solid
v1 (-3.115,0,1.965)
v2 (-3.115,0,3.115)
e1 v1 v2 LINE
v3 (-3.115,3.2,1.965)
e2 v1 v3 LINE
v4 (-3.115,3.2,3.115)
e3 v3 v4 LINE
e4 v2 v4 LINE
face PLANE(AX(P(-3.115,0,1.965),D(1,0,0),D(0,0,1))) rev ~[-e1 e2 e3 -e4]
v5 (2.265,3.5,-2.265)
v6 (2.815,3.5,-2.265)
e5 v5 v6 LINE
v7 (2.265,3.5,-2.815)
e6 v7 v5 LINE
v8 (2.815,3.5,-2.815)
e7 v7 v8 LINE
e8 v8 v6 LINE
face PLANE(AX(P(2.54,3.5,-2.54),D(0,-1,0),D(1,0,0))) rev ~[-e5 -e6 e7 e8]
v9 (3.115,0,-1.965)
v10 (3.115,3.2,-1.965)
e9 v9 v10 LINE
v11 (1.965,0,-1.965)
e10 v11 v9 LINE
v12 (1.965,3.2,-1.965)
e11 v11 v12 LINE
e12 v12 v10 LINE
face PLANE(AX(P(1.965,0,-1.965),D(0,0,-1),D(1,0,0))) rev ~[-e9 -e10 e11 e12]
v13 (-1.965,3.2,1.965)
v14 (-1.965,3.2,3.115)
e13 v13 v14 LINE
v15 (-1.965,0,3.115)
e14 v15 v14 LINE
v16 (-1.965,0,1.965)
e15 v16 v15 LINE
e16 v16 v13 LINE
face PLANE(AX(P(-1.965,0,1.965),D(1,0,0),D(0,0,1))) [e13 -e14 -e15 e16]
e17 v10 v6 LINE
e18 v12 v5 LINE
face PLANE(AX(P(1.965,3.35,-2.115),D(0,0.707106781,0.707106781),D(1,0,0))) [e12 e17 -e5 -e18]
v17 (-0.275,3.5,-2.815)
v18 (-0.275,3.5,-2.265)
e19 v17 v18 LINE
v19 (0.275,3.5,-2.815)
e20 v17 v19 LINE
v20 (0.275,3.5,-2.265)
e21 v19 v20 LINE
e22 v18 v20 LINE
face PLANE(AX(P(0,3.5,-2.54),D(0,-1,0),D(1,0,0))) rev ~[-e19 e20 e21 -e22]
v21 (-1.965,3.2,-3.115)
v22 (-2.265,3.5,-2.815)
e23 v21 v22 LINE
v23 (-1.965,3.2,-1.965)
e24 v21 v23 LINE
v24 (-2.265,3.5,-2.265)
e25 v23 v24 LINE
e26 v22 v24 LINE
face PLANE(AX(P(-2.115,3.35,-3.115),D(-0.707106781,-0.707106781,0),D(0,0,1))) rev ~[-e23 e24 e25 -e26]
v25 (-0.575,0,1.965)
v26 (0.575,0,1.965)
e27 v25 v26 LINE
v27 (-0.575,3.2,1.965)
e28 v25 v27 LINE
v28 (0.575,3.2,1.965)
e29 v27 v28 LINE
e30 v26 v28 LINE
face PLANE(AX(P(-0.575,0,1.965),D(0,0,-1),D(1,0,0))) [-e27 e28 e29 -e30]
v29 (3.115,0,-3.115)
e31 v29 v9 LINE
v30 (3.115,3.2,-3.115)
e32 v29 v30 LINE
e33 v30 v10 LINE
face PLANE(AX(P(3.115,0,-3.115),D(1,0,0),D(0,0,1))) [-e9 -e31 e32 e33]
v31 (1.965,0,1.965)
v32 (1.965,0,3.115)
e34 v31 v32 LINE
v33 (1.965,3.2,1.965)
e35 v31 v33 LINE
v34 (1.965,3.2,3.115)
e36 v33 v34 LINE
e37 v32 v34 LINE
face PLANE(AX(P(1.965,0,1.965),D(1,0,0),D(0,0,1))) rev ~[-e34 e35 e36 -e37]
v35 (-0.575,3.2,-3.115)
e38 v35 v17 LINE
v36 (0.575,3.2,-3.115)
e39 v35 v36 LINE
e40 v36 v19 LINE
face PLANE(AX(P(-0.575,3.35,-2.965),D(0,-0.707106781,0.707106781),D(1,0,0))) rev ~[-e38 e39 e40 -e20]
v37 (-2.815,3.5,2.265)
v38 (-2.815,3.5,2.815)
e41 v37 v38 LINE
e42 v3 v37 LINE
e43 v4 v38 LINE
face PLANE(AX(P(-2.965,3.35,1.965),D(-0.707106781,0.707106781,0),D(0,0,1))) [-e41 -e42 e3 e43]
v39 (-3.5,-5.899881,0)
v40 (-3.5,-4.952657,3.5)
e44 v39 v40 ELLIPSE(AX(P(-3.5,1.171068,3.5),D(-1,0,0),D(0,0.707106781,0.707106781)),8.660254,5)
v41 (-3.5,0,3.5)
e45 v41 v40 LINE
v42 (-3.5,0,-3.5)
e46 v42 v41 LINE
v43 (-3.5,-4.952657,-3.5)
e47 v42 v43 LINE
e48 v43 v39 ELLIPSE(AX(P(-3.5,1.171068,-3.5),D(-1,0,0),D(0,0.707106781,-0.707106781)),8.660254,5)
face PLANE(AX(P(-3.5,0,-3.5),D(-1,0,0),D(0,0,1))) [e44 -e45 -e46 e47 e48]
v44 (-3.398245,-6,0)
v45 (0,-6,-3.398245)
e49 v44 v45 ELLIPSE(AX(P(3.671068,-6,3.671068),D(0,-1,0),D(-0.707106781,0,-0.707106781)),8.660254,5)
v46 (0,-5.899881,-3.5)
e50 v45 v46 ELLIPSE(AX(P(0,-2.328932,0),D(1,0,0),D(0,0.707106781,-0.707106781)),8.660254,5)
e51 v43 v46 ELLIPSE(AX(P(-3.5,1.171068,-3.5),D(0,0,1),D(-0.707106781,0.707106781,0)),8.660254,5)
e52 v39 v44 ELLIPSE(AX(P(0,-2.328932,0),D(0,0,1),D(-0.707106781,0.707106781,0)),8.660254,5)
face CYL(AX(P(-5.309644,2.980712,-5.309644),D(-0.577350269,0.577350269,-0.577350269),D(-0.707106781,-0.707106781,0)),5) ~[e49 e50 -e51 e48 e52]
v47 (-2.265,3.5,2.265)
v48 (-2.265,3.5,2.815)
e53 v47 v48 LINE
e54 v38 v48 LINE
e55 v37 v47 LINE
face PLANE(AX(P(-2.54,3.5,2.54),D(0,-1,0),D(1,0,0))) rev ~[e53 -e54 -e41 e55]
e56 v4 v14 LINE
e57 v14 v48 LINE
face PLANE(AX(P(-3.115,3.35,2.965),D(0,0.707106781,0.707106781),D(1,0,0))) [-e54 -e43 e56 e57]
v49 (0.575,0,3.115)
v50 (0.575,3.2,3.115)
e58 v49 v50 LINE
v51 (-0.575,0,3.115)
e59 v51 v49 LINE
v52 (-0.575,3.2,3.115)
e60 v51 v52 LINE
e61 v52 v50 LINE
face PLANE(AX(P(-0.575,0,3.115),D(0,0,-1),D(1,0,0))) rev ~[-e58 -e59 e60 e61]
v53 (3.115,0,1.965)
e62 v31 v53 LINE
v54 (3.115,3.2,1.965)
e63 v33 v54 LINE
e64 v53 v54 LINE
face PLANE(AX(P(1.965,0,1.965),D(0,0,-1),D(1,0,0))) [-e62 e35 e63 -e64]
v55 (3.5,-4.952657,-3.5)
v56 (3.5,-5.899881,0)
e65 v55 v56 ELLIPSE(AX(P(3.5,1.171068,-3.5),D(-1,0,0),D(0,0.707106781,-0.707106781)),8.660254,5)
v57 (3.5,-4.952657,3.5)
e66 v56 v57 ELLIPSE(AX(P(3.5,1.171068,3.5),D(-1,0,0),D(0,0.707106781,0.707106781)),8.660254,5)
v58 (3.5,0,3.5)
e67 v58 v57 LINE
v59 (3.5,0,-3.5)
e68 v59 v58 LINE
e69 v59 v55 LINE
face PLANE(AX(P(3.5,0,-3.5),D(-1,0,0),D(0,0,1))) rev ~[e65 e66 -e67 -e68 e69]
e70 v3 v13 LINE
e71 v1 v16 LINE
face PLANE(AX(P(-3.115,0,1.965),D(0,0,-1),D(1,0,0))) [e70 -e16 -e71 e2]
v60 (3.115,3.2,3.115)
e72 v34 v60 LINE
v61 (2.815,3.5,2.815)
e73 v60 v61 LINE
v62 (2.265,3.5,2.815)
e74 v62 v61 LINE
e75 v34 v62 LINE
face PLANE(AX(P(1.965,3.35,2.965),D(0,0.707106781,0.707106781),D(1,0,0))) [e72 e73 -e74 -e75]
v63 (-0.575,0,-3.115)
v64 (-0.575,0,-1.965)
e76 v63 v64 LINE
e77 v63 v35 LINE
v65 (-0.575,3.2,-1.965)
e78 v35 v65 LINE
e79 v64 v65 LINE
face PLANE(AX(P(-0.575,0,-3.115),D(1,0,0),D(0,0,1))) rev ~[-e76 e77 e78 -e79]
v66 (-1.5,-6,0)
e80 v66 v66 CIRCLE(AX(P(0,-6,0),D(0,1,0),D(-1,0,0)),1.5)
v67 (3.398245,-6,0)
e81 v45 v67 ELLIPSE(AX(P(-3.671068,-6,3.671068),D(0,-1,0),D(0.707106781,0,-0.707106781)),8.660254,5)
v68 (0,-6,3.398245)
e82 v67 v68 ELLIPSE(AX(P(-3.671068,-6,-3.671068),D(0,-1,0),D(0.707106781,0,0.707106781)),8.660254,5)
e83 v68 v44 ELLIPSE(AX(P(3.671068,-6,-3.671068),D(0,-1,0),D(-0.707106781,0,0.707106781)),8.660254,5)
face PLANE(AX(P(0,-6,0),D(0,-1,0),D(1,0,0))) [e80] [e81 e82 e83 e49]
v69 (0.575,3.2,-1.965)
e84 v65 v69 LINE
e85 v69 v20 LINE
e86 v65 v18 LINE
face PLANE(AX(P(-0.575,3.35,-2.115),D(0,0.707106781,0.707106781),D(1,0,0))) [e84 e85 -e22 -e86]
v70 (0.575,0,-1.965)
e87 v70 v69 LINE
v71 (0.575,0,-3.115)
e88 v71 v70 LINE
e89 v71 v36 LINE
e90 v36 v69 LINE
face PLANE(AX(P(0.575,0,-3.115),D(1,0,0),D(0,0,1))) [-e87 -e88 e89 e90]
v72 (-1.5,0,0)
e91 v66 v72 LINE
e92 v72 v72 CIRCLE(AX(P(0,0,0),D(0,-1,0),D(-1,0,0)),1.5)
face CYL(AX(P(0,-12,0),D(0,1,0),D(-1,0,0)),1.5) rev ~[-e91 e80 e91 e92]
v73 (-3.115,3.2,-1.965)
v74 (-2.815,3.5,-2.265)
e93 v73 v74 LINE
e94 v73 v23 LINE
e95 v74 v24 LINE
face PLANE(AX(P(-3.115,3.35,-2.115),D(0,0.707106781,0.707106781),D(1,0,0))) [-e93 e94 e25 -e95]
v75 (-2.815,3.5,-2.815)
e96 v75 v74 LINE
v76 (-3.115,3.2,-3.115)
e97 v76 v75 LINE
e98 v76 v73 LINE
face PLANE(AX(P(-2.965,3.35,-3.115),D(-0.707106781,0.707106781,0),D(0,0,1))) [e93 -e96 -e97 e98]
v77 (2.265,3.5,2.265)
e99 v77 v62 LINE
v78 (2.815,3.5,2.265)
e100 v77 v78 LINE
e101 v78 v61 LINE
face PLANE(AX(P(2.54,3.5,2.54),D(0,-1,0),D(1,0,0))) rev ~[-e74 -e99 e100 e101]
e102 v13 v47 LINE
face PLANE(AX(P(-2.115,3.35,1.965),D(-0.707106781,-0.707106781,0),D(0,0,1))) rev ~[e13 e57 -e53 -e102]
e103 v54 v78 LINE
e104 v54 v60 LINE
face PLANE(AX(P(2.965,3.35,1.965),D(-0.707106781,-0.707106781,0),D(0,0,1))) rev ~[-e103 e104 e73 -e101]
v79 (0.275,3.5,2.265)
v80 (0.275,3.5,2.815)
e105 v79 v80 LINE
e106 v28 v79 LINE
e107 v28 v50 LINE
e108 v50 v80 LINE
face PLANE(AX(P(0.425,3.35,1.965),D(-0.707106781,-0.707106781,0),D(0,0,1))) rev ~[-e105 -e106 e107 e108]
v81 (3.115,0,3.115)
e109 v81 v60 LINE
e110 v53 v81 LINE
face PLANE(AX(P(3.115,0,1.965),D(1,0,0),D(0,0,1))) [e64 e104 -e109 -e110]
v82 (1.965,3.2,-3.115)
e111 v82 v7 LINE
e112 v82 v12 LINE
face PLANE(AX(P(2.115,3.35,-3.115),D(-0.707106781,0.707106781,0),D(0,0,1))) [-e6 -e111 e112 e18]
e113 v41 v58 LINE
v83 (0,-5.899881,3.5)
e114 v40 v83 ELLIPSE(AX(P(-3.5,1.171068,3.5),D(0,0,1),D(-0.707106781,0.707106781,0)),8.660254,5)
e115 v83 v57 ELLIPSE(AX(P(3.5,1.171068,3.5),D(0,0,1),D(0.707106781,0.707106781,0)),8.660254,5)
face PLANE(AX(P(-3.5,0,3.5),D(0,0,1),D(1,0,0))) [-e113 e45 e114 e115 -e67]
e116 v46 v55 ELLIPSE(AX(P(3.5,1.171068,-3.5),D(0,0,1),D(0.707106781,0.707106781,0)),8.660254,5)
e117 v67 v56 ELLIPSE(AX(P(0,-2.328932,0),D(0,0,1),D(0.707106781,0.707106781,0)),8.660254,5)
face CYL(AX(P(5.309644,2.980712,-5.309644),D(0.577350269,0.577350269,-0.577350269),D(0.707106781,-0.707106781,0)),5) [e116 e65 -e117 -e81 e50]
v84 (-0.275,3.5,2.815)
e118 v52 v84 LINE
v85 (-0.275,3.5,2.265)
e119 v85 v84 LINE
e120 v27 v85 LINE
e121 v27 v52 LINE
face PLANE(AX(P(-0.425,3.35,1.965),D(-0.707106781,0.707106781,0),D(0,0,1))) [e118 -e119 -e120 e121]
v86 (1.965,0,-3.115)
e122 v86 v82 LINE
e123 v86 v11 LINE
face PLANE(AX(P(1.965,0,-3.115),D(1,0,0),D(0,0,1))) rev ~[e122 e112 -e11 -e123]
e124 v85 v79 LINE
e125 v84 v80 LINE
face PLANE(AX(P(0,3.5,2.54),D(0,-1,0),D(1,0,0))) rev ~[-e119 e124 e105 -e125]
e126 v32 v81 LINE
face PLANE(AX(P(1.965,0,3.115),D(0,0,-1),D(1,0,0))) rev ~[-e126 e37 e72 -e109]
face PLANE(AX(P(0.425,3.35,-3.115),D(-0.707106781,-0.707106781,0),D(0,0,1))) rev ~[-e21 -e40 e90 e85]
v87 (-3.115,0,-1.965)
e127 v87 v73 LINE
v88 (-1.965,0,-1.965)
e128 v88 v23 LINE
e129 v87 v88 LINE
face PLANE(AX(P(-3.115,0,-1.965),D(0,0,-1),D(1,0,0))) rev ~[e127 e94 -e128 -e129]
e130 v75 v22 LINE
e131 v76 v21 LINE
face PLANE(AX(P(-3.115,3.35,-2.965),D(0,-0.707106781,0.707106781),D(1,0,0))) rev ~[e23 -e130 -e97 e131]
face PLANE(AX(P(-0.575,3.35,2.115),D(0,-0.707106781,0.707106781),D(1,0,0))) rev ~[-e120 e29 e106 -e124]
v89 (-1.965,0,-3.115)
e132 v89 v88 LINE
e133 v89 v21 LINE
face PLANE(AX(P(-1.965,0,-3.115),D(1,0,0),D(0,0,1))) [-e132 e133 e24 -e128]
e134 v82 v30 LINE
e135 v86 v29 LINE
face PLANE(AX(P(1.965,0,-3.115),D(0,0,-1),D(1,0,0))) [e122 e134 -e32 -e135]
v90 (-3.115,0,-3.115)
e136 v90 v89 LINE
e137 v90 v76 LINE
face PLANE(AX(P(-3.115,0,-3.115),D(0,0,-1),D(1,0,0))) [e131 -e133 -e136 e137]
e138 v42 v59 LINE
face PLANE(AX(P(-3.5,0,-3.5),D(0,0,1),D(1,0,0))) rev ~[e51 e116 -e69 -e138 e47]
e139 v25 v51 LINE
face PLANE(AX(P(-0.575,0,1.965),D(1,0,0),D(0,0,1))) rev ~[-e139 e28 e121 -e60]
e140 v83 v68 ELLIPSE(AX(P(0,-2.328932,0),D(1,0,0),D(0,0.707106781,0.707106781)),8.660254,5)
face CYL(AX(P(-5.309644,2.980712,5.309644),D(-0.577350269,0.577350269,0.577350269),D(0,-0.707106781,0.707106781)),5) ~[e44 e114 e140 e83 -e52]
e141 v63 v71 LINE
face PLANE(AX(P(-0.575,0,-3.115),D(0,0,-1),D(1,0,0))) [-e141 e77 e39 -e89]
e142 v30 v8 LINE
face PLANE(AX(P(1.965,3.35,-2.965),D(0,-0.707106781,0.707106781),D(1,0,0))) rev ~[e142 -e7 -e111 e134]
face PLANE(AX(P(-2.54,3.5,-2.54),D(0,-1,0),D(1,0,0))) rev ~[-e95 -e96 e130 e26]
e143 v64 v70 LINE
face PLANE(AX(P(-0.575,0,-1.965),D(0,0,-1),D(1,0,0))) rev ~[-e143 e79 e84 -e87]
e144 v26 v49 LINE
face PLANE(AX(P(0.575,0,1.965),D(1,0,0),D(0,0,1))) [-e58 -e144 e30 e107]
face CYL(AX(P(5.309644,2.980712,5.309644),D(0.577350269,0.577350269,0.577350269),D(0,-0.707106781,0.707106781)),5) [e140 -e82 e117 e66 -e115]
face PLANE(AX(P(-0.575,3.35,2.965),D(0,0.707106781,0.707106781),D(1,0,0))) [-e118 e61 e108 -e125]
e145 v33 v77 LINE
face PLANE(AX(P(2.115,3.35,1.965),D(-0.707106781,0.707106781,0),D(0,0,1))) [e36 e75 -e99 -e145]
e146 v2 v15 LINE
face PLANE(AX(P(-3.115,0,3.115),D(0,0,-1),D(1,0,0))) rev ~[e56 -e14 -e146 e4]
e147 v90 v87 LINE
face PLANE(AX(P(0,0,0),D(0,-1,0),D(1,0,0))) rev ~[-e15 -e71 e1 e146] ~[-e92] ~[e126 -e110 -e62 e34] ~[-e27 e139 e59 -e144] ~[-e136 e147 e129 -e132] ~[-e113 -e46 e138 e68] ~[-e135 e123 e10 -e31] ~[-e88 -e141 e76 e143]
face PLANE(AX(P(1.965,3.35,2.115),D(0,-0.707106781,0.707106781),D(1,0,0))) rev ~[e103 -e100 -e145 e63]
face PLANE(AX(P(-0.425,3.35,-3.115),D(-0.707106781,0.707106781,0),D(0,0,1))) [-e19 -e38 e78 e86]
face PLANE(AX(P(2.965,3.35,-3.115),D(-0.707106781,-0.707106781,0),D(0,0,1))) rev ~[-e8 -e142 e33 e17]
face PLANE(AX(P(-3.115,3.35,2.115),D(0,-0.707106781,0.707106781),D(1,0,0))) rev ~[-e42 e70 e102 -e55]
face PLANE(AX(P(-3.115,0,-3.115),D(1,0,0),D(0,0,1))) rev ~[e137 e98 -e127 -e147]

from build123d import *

# Parameters (mm, degrees)
F0_W        = 7
F0_H        = 7
F0_W_2      = 1.15
F0_H_2      = 1.15
F1_DEPTH    = 6
F2_SIZE     = 0.1
F3_T1_DEPTH = 14.6069618105
F3_T3_DEPTH = 14.6069618105
F3_T5_DEPTH = 14.6069618105
F3_T7_DEPTH = 14.6069618105
F6_D        = 3
F6_DEPTH    = 6
F6_TIP      = 0.9012909285
F8_DEPTH    = 3.5
F9_SIZE     = 0.3


# Not quite as in the source:
# - a fillet or chamfer that OpenCascade refuses, or shapes differently, is made with other operations: its cross-section is extruded or revolved along the edge and cut away or added


with BuildPart() as f1:
    # F0 (on Front) → F1 (new body)
    with BuildSketch(Plane.XZ):
        Rectangle(F0_W, F0_H)
        with Locations((-2.54, -2.54)):
            Rectangle(F0_W_2, F0_H_2, mode=Mode.SUBTRACT)
        with Locations((0, -2.54)):
            Rectangle(F0_W_2, F0_H_2, mode=Mode.SUBTRACT)
        with Locations((2.54, -2.54)):
            Rectangle(F0_W_2, F0_H_2, mode=Mode.SUBTRACT)
        with Locations((-2.54, 2.54)):
            Rectangle(F0_W_2, F0_H_2, mode=Mode.SUBTRACT)
        with Locations((0, 2.54)):
            Rectangle(F0_W_2, F0_H_2, mode=Mode.SUBTRACT)
        with Locations((2.54, 2.54)):
            Rectangle(F0_W_2, F0_H_2, mode=Mode.SUBTRACT)
        with Locations((-2.54, -2.54)):
            Rectangle(F0_W_2, F0_H_2)
        with Locations((0, -2.54)):
            Rectangle(F0_W_2, F0_H_2)
        with Locations((0, 2.54)):
            Rectangle(F0_W_2, F0_H_2)
        with Locations((-2.54, 2.54)):
            Rectangle(F0_W_2, F0_H_2)
        with Locations((2.54, 2.54)):
            Rectangle(F0_W_2, F0_H_2)
        with Locations((2.54, -2.54)):
            Rectangle(F0_W_2, F0_H_2)
    extrude(amount=F1_DEPTH)

    # F2
    f2_edges = [f1.edges().sort_by_distance(p)[0] for p in [
        (3.5, -6, 0),
        (0, -6, 3.5),
        (-3.5, -6, 0),
        (0, -6, -3.5),
    ]]
    chamfer(f2_edges, length=F2_SIZE)

    # F3: fillet of radius 5 on 4 edges, made by hand

    # F3_s2 → F3_t1 (cut)
    with BuildSketch(Plane(origin=(4.5333333333, 4.5333333333, 4.5333333333), x_dir=(0.7071067812, -0.7071067812, 0), z_dir=(-0.5773502692, -0.5773502692, -0.5773502692))):
        with BuildLine():
            ThreePointArc((4.1468037432, 5.2809096033), (5.9769307621, 3.4507825844), (6.6468037432, 0.9507825844))
            Line((6.6468037432, 0.9507825844), (6.6468037432, 3.8375339304))
            Line((6.6468037432, 3.8375339304), (4.1468037432, 5.2809096033))
        make_face()
    extrude(amount=F3_T1_DEPTH, mode=Mode.SUBTRACT)

    # F3_s4 → F3_t3 (cut)
    with BuildSketch(Plane(origin=(-4.5333333333, 4.5333333333, 4.5333333333), x_dir=(0.7071067812, 0.7071067812, 0), z_dir=(0.5773502692, -0.5773502692, -0.5773502692))):
        with BuildLine():
            ThreePointArc((-4.1468037432, 5.2809096033), (-5.9769307621, 3.4507825844), (-6.6468037432, 0.9507825844))
            Line((-6.6468037432, 0.9507825844), (-6.6468037432, 3.8375339304))
            Line((-6.6468037432, 3.8375339304), (-4.1468037432, 5.2809096033))
        make_face()
    extrude(amount=F3_T3_DEPTH, mode=Mode.SUBTRACT)

    # F3_s6 → F3_t5 (cut)
    with BuildSketch(Plane(origin=(4.5333333333, 4.5333333333, -4.5333333333), x_dir=(0.7071067812, -0.7071067812, 0), z_dir=(-0.5773502692, -0.5773502692, 0.5773502692))):
        with BuildLine():
            ThreePointArc((6.6468037432, -0.9507825844), (5.9769307621, -3.4507825844), (4.1468037432, -5.2809096033))
            Line((4.1468037432, -5.2809096033), (6.6468037432, -3.8375339304))
            Line((6.6468037432, -3.8375339304), (6.6468037432, -0.9507825844))
        make_face()
    extrude(amount=F3_T5_DEPTH, mode=Mode.SUBTRACT)

    # F3_s8 → F3_t7 (cut)
    with BuildSketch(Plane(origin=(-4.5333333333, 4.5333333333, -4.5333333333), x_dir=(0.7071067812, 0.7071067812, 0), z_dir=(0.5773502692, -0.5773502692, 0.5773502692))):
        with BuildLine():
            ThreePointArc((-6.6468037432, -0.9507825844), (-5.9769307621, -3.4507825844), (-4.1468037432, -5.2809096033))
            Line((-4.1468037432, -5.2809096033), (-6.6468037432, -3.8375339304))
            Line((-6.6468037432, -3.8375339304), (-6.6468037432, -0.9507825844))
        make_face()
    extrude(amount=F3_T7_DEPTH, mode=Mode.SUBTRACT)

    # F6
    with Locations(Plane.XZ.offset(6)):
        with Locations((0, 0)):
            Hole(F6_D / 2, depth=F6_DEPTH)
            with Locations((0, 0, -(F6_DEPTH + F6_TIP / 2))):  # 118° drill point
                Cone(0, F6_D / 2, F6_TIP, mode=Mode.SUBTRACT)

    # F0 (on Front) → F8 (join)
    with BuildSketch(Plane.XZ):
        with Locations((2.54, 2.54)):
            Rectangle(F0_W_2, F0_H_2)
        with Locations((0, 2.54)):
            Rectangle(F0_W_2, F0_H_2)
        with Locations((-2.54, 2.54)):
            Rectangle(F0_W_2, F0_H_2)
        with Locations((-2.54, -2.54)):
            Rectangle(F0_W_2, F0_H_2)
        with Locations((0, -2.54)):
            Rectangle(F0_W_2, F0_H_2)
        with Locations((2.54, -2.54)):
            Rectangle(F0_W_2, F0_H_2)
    extrude(amount=-F8_DEPTH)

    # F9
    f9_edges = [f1.edges().sort_by_distance(p)[0] for p in [
        (2.54, 3.5, -3.115),
        (1.965, 3.5, -2.54),
        (3.115, 3.5, -2.54),
        (2.54, 3.5, -1.965),
        (0.575, 3.5, -2.54),
        (0, 3.5, -3.115),
        (-0.575, 3.5, -2.54),
        (0, 3.5, -1.965),
        (-1.965, 3.5, -2.54),
        (-2.54, 3.5, -1.965),
        (-3.115, 3.5, -2.54),
        (-2.54, 3.5, -3.115),
        (3.115, 3.5, 2.54),
        (2.54, 3.5, 1.965),
        (1.965, 3.5, 2.54),
        (2.54, 3.5, 3.115),
        (0.575, 3.5, 2.54),
        (0, 3.5, 3.115),
        (-0.575, 3.5, 2.54),
        (0, 3.5, 1.965),
        (-1.965, 3.5, 2.54),
        (-2.54, 3.5, 1.965),
        (-3.115, 3.5, 2.54),
        (-2.54, 3.5, 3.115),
    ]]
    chamfer(f9_edges, length=F9_SIZE)


solid = f1.part
